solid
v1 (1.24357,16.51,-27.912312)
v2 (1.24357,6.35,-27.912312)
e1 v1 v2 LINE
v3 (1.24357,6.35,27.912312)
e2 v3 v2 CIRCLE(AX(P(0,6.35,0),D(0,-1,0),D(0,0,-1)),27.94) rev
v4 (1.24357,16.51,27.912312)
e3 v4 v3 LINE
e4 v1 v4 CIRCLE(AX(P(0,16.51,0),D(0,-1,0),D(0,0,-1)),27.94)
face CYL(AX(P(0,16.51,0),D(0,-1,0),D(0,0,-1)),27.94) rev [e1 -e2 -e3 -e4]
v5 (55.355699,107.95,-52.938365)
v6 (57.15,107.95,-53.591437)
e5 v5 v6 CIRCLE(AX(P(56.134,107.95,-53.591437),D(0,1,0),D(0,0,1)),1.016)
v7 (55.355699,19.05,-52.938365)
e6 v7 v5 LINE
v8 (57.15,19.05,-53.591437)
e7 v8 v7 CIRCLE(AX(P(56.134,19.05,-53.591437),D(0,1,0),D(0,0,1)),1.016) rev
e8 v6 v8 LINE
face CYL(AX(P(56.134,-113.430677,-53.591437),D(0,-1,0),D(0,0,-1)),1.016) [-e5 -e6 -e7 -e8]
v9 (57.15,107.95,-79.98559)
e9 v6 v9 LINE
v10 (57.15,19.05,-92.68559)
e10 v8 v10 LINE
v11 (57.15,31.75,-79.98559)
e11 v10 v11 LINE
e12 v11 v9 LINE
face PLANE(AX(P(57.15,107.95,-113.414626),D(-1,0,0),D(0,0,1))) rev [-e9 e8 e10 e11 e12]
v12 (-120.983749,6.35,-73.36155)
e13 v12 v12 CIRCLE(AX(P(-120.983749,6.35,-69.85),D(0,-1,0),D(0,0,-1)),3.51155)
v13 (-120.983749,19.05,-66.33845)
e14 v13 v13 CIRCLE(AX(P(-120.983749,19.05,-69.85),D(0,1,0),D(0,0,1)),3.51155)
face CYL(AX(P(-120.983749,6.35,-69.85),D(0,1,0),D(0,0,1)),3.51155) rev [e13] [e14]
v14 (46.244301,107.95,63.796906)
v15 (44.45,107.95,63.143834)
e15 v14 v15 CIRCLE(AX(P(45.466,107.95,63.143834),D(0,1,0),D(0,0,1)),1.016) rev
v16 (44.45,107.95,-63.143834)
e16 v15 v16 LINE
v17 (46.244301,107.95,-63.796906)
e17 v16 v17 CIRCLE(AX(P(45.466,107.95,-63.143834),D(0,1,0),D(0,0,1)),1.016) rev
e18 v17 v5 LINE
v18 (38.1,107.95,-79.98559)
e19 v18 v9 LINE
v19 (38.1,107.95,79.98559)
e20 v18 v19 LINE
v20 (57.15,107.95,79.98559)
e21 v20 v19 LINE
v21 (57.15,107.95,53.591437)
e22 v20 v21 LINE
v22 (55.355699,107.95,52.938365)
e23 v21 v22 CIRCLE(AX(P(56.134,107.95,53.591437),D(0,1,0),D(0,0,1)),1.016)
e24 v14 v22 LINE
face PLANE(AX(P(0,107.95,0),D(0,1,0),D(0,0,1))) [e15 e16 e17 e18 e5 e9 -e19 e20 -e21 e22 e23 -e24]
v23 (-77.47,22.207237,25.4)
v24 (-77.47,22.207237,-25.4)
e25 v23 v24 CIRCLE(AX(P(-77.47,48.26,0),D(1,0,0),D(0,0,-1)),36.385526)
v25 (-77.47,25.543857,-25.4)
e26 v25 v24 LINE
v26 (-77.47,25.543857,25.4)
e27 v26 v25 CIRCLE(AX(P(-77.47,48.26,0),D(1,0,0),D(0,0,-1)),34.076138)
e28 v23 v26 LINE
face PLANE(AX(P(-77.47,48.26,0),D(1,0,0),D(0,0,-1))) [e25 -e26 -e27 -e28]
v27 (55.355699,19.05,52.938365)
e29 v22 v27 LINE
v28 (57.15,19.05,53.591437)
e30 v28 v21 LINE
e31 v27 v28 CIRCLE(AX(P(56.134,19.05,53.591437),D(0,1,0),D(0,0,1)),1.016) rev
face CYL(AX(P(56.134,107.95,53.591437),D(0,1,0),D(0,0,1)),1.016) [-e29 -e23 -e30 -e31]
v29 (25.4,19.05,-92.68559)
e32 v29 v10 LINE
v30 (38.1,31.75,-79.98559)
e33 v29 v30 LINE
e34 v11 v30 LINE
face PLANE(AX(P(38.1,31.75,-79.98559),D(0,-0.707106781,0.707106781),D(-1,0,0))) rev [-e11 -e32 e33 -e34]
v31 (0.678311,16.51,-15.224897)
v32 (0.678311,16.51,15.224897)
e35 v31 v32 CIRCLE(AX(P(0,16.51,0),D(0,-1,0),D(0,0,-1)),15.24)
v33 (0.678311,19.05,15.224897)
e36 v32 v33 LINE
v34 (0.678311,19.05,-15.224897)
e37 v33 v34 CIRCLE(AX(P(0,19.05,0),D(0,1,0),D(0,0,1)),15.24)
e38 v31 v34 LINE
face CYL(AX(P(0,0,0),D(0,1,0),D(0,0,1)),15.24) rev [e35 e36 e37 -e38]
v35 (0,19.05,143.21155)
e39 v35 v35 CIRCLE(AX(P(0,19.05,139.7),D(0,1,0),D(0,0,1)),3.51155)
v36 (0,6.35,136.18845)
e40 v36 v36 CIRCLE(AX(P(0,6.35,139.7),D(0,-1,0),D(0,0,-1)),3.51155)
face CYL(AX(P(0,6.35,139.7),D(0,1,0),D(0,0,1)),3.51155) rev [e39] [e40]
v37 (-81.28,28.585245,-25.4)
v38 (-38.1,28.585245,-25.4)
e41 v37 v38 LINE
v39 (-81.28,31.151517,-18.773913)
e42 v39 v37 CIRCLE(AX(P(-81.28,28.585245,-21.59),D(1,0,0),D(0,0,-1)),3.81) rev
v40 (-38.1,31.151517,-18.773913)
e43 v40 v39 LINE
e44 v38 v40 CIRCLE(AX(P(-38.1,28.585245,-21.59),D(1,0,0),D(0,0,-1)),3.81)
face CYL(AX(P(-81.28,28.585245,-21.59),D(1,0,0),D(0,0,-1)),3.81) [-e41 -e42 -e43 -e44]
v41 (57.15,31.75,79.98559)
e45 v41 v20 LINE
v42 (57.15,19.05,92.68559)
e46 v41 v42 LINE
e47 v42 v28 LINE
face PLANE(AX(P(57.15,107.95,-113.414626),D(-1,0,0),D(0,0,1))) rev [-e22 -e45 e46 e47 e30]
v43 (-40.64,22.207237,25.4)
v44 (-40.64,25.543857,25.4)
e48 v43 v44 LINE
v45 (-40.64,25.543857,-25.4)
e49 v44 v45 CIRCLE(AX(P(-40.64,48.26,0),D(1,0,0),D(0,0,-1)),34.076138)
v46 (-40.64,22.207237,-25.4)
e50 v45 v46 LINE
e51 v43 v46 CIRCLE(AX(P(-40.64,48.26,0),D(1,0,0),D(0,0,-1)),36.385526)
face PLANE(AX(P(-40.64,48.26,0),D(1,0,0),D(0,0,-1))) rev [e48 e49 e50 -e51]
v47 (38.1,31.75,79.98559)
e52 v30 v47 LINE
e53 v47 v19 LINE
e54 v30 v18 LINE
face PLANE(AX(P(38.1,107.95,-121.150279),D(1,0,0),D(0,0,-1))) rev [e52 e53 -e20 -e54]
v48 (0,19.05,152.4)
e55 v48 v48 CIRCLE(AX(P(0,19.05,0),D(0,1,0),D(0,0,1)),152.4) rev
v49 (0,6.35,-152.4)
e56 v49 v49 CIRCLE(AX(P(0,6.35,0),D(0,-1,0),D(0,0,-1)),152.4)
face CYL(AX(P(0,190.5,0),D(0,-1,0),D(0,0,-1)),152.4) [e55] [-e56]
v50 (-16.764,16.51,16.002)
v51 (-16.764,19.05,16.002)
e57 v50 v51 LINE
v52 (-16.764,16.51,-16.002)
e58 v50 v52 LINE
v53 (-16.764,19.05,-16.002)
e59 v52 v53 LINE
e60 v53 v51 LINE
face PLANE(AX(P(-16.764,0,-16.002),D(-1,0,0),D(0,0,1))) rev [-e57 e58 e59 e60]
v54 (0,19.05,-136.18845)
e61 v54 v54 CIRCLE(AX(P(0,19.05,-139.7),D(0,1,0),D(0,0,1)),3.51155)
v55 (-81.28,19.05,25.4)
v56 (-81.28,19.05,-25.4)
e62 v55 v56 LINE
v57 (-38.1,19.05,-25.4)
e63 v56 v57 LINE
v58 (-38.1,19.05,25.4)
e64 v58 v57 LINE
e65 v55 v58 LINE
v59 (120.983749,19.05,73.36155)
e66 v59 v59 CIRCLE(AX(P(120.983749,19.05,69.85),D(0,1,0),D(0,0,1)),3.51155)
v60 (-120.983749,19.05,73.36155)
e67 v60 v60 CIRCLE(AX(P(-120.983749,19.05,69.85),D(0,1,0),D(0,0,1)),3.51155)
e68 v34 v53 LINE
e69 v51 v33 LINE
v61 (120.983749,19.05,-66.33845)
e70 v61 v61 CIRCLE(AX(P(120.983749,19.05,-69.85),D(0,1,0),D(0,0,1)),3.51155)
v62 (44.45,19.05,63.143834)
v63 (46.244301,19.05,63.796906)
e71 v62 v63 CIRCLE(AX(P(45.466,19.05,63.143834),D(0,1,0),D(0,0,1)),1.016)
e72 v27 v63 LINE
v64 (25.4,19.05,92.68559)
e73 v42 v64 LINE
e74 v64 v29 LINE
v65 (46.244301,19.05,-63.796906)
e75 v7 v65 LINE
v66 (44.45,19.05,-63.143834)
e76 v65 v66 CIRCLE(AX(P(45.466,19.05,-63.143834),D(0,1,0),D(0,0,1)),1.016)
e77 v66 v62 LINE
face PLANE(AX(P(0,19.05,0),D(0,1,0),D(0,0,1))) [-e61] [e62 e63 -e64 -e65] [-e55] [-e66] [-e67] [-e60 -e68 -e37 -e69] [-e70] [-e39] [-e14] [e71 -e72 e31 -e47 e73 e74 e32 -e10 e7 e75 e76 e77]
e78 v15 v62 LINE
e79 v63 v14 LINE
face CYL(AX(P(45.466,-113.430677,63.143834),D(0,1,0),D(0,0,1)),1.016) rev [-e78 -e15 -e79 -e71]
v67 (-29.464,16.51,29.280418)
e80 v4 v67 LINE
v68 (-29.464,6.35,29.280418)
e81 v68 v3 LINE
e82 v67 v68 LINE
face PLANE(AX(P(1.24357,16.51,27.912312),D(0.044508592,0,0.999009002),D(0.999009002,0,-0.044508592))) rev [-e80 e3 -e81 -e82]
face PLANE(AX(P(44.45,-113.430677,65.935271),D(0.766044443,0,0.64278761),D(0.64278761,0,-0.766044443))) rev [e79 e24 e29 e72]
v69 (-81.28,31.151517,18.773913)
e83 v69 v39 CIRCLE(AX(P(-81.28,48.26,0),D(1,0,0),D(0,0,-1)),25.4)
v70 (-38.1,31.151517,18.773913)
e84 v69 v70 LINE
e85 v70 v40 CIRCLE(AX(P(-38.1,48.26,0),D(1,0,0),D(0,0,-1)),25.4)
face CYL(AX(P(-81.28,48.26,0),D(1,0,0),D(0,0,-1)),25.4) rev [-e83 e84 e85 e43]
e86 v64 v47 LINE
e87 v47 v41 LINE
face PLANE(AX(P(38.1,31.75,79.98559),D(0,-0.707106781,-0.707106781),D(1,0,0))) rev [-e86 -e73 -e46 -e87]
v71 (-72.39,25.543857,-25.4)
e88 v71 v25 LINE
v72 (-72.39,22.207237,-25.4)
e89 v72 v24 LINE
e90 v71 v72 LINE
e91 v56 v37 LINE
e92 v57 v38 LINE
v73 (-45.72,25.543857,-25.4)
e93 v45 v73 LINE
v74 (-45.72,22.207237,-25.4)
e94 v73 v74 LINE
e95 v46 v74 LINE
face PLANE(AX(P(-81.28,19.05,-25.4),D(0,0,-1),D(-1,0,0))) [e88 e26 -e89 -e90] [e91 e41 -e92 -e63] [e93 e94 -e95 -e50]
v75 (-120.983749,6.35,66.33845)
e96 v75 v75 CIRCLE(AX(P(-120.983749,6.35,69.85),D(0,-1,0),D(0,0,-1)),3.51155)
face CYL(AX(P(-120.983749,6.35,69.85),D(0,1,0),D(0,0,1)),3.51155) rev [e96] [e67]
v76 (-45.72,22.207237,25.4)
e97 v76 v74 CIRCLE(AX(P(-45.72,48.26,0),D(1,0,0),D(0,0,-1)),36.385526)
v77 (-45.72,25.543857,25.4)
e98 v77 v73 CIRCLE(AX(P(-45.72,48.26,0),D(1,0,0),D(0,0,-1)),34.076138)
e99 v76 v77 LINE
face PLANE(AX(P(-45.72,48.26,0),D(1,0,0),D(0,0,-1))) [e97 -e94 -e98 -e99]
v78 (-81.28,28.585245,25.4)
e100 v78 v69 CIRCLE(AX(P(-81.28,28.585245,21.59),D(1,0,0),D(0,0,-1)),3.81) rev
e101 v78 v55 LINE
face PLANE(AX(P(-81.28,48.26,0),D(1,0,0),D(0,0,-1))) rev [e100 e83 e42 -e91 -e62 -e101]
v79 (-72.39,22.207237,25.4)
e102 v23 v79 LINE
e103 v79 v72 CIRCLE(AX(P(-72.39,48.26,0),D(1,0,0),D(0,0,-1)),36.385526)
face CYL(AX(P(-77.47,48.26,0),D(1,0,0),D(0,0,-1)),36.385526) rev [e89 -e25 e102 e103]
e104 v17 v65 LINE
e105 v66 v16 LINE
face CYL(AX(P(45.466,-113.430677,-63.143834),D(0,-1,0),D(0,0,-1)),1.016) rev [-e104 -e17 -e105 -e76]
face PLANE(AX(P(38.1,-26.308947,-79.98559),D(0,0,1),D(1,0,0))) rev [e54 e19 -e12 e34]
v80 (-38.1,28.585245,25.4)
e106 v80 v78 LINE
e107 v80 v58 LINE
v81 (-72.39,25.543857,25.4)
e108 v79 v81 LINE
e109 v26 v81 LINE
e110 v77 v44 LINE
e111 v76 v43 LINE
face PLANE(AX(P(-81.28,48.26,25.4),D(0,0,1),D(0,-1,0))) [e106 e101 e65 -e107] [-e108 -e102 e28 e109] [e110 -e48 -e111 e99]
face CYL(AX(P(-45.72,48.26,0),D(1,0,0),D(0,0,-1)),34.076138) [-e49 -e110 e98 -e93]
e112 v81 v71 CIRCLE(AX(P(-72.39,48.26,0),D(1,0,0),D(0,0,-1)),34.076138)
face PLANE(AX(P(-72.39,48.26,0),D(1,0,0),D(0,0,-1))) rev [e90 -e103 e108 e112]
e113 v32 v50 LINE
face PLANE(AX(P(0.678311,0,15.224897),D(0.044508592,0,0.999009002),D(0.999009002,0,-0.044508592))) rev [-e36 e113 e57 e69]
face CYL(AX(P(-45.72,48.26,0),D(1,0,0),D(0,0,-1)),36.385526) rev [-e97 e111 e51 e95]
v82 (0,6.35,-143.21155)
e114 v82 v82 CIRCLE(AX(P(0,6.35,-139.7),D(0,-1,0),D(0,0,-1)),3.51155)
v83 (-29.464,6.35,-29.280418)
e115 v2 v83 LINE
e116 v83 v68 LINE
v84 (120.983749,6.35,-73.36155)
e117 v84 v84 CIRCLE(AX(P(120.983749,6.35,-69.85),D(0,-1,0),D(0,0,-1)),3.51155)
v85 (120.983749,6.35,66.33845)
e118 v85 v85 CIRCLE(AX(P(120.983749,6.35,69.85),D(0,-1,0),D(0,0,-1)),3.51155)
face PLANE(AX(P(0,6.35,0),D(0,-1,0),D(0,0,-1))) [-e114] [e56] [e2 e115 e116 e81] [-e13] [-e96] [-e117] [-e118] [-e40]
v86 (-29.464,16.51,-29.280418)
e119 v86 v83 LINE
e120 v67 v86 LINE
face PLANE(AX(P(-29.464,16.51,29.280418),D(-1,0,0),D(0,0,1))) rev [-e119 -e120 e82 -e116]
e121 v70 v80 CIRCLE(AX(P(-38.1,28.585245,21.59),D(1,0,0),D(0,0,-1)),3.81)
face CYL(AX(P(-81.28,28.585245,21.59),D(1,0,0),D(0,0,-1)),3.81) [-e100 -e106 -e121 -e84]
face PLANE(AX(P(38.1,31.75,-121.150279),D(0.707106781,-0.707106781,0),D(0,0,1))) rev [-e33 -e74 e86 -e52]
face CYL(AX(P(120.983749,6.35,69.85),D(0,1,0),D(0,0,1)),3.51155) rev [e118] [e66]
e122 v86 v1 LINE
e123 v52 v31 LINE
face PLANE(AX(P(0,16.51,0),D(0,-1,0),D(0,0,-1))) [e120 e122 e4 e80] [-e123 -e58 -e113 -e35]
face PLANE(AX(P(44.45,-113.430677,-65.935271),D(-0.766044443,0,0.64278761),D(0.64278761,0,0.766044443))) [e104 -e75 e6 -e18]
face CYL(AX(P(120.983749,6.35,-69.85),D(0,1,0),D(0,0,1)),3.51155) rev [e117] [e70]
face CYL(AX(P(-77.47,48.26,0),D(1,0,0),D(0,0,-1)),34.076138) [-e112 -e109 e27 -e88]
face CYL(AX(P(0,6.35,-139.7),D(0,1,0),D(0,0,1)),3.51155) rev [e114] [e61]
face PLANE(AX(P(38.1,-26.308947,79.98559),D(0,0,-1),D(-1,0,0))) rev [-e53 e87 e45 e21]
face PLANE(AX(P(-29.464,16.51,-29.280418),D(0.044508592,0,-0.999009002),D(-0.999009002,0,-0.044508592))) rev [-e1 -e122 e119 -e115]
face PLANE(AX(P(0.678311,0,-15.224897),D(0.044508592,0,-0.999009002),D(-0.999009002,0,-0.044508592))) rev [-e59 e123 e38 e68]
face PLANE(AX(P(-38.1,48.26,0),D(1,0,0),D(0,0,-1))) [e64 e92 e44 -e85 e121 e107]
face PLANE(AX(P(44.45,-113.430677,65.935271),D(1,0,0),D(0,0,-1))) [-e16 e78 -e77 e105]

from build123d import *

# Parameters (mm, degrees)
SKETCH1_R           = 127
BOSS_EXTRUDE1_DEPTH = 19.05
CUT_EXTRUDE1_DEPTH  = 19.05
BOSS_EXTRUDE2_DEPTH = 43.18
FILLET1_R           = 3.81
CUT_EXTRUDE4_START  = -5.08
SKETCH7_R           = 36.385525633
SKETCH7_R_2         = 34.07613751
CUT_EXTRUDE4_DEPTH  = 2.54
CUT_EXTRUDE5_START  = -36.83
SKETCH8_R           = 36.385525633
SKETCH8_R_2         = 34.07613751
CUT_EXTRUDE5_DEPTH  = 2.54
SKETCH4_R           = 152.4
SKETCH4_R_2         = 127
BOSS_EXTRUDE3_DEPTH = 190.5
CUT_EXTRUDE2_START  = 12.7
CUT_EXTRUDE2_DEPTH  = 12.7
CUT_EXTRUDE6_START  = -12.7
SKETCH6_R           = 3.51155
CUT_EXTRUDE6_DEPTH  = 171.45
BOSS_EXTRUDE4_DEPTH = 88.9
CUT_EXTRUDE8_DEPTH  = 88.9
FILLET2_R           = 1.016
CUT_EXTRUDE9_START  = -16.51
CUT_EXTRUDE9_DEPTH  = 16.51
CUT_EXTRUDE12_START = -171.45
SKETCH14_R          = 152.4
SKETCH14_R_2        = 127
CUT_EXTRUDE12_DEPTH = 171.45
SKETCH15_R          = 152.4
CUT_EXTRUDE13_DEPTH = 6.35
SKETCH17_W          = 19.05
SKETCH17_H          = 41.16468875
CUT_EXTRUDE15_DEPTH = 88.9
CHAMFER2_SIZE       = 12.7


with BuildPart() as part:
    # Sketch1 → Boss-Extrude1 (new body)
    with BuildSketch(Plane(origin=(0, 0, 0), x_dir=(1, 0, 0), z_dir=(0, 1, 0))):
        with Locations(Location((0, 0, 0), (0, 0, 90))):
            Circle(SKETCH1_R)
    extrude(amount=BOSS_EXTRUDE1_DEPTH)

    # Sketch2 → Cut-Extrude1 (cut)
    with BuildSketch(Plane(origin=(0, 19.05, 0), x_dir=(1, 0, 0), z_dir=(0, 1, 0))):
        with BuildLine():
            Line((-16.764, 16.002), (-16.764, -16.002))
            Line((-16.764, -16.002), (0.678310948, -15.224897184))
            ThreePointArc((0.678310948, -15.224897184), (15.24, 0), (0.678310948, 15.224897184))
            Line((0.678310948, 15.224897184), (-16.764, 16.002))
        make_face()
    extrude(amount=-CUT_EXTRUDE1_DEPTH, mode=Mode.SUBTRACT)

    # Sketch3 → Boss-Extrude2 (add)
    with BuildSketch(Plane(origin=(-38.1, 0, 0), x_dir=(0, 0, -1), z_dir=(1, 0, 0))):
        with BuildLine():
            Line((-25.4, 19.05), (25.4, 19.05))
            Line((25.4, 19.05), (25.4, 48.26))
            ThreePointArc((25.4, 48.26), (0, 22.86), (-25.4, 48.26))
            Line((-25.4, 48.26), (-25.4, 19.05))
        make_face()
    extrude(amount=-BOSS_EXTRUDE2_DEPTH)

    # Fillet1
    fillet1_edges = [part.edges().sort_by_distance(p)[0] for p in [
        (-59.69, 48.26, 25.4),
        (-59.69, 48.26, -25.4),
    ]]
    fillet(fillet1_edges, radius=FILLET1_R - 0.0001)  # a hair under: the kernel refuses the full size

    # Sketch7 → Cut-Extrude4 (cut, symmetric)
    with BuildSketch(Plane(origin=(-38.1, 0, 0), x_dir=(0, 0, -1), z_dir=(1, 0, 0)).offset(CUT_EXTRUDE4_START)):
        with Locations((0, 48.26)):
            Circle(SKETCH7_R)
        with Locations((0, 48.26)):
            Circle(SKETCH7_R_2, mode=Mode.SUBTRACT)
    extrude(amount=CUT_EXTRUDE4_DEPTH, both=True, mode=Mode.SUBTRACT)

    # Sketch8 → Cut-Extrude5 (cut, symmetric)
    with BuildSketch(Plane(origin=(-38.1, 0, -38.1), x_dir=(0, 0, -1), z_dir=(1, 0, 0)).offset(CUT_EXTRUDE5_START)):
        with Locations((-38.1, 48.26)):
            Circle(SKETCH8_R)
        with Locations((-38.1, 48.26)):
            Circle(SKETCH8_R_2, mode=Mode.SUBTRACT)
    extrude(amount=CUT_EXTRUDE5_DEPTH, both=True, mode=Mode.SUBTRACT)

    # Sketch4 → Boss-Extrude3 (add)
    with BuildSketch(Plane(origin=(0, 0, 0), x_dir=(1, 0, 0), z_dir=(0, 1, 0))):
        with Locations(Location((0, 0, 0), (0, 0, 270))):
            Circle(SKETCH4_R)
        with Locations(Location((0, 0, 0), (0, 0, 270))):
            Circle(SKETCH4_R_2, mode=Mode.SUBTRACT)
    extrude(amount=BOSS_EXTRUDE3_DEPTH)

    # Sketch5 → Cut-Extrude2 (cut)
    with BuildSketch(Plane(origin=(0, 190.5, -228.6), x_dir=(1, 0, 0), z_dir=(0, -1, 0)).offset(CUT_EXTRUDE2_START)):
        with BuildLine():
            Line((-25.4, 351.737617729), (-25.4, 378.868426491))
            ThreePointArc((-25.4, 378.868426491), (0, 381), (25.4, 378.868426491))
            Line((25.4, 378.868426491), (25.4, 351.737617729))
            ThreePointArc((25.4, 351.737617729), (62.865, 337.485374018), (93.940305115, 312.165854121))
            Line((93.940305115, 312.165854121), (117.436274728, 325.731258501))
            ThreePointArc((117.436274728, 325.731258501), (131.982271537, 304.8), (142.836274728, 281.737167989))
            Line((142.836274728, 281.737167989), (119.340305115, 268.171763608))
            ThreePointArc((119.340305115, 268.171763608), (125.73, 228.6), (119.340305115, 189.028236392))
            Line((119.340305115, 189.028236392), (142.836274728, 175.462832011))
            ThreePointArc((142.836274728, 175.462832011), (131.982271537, 152.4), (117.436274728, 131.468741499))
            Line((117.436274728, 131.468741499), (93.940305115, 145.034145879))
            ThreePointArc((93.940305115, 145.034145879), (62.865, 119.714625982), (25.4, 105.462382271))
            Line((25.4, 105.462382271), (25.4, 78.331573509))
            ThreePointArc((25.4, 78.331573509), (0, 76.2), (-25.4, 78.331573509))
            Line((-25.4, 78.331573509), (-25.4, 105.462382271))
            ThreePointArc((-25.4, 105.462382271), (-62.865, 119.714625982), (-93.940305115, 145.034145879))
            Line((-93.940305115, 145.034145879), (-117.436274728, 131.468741499))
            ThreePointArc((-117.436274728, 131.468741499), (-131.982271537, 152.4), (-142.836274728, 175.462832011))
            Line((-142.836274728, 175.462832011), (-119.340305115, 189.028236392))
            ThreePointArc((-119.340305115, 189.028236392), (-125.73, 228.6), (-119.340305115, 268.171763608))
            Line((-119.340305115, 268.171763608), (-142.836274728, 281.737167989))
            ThreePointArc((-142.836274728, 281.737167989), (-131.982271537, 304.8), (-117.436274728, 325.731258501))
            Line((-117.436274728, 325.731258501), (-93.940305115, 312.165854121))
            ThreePointArc((-93.940305115, 312.165854121), (-62.865, 337.485374018), (-25.4, 351.737617729))
        make_face()
    extrude(amount=-CUT_EXTRUDE2_DEPTH, mode=Mode.SUBTRACT)

    # Sketch6 → Cut-Extrude6 (cut)
    with BuildSketch(Plane(origin=(0, 190.5, 0), x_dir=(1, 0, 0), z_dir=(0, 1, 0)).offset(CUT_EXTRUDE6_START)):
        with Locations(Location((0, 139.7, 0), (0, 0, 90))):
            Circle(SKETCH6_R)
        with Locations(Location((120.983748909, 69.85, 0), (0, 0, 90))):
            Circle(SKETCH6_R)
        with Locations(Location((120.983748909, -69.85, 0), (0, 0, 90))):
            Circle(SKETCH6_R)
        with Locations(Location((0, -139.7, 0), (0, 0, 90))):
            Circle(SKETCH6_R)
        with Locations(Location((-120.983748909, -69.85, 0), (0, 0, 90))):
            Circle(SKETCH6_R)
        with Locations(Location((-120.983748909, 69.85, 0), (0, 0, 90))):
            Circle(SKETCH6_R)
    extrude(amount=-CUT_EXTRUDE6_DEPTH, mode=Mode.SUBTRACT)

    # Sketch9 → Boss-Extrude4 (add)
    with BuildSketch(Plane(origin=(0, 19.05, 0), x_dir=(1, 0, 0), z_dir=(0, 1, 0))):
        with BuildLine():
            Line((38.1, 121.15027858), (38.1, -121.15027858))
            ThreePointArc((38.1, -121.15027858), (47.781803057, -117.668599451), (57.15, -113.414626482))
            Line((57.15, -113.414626482), (57.15, 113.414626482))
            ThreePointArc((57.15, 113.414626482), (47.781803057, 117.668599451), (38.1, 121.15027858))
        make_face()
    extrude(amount=BOSS_EXTRUDE4_DEPTH)

    # Sketch10 → Cut-Extrude8 (cut)
    with BuildSketch(Plane(origin=(0, 107.95, 0), x_dir=(1, 0, 0), z_dir=(0, 1, 0))):
        Polygon((57.15, -50.8), (57.15, 50.8), (44.45, 65.935270626), (44.45, -65.935270626), align=None)
    extrude(amount=-CUT_EXTRUDE8_DEPTH, mode=Mode.SUBTRACT)

    # Fillet2
    fillet2_edges = [part.edges().sort_by_distance(p)[0] for p in [
        (44.45, 63.5, 65.935270626),
        (44.45, 63.5, -65.935270626),
        (57.15, 63.5, -50.8),
        (57.15, 63.5, 50.8),
    ]]
    fillet(fillet2_edges, radius=FILLET2_R)

    # Sketch11 → Cut-Extrude9 (cut)
    with BuildSketch(Plane.XZ.offset(CUT_EXTRUDE9_START)):
        with BuildLine():
            Line((-29.464, 29.280418015), (-29.464, -29.280418015))
            Line((-29.464, -29.280418015), (1.243570072, -27.912311504))
            ThreePointArc((1.243570072, -27.912311504), (27.94, 0), (1.243570072, 27.912311504))
            Line((1.243570072, 27.912311504), (-29.464, 29.280418015))
        make_face()
        with BuildLine():
            Line((-16.764, 16.002), (-16.764, -16.002))
            Line((-16.764, -16.002), (0.678310948, -15.224897184))
            ThreePointArc((0.678310948, -15.224897184), (15.24, 0), (0.678310948, 15.224897184))
            Line((0.678310948, 15.224897184), (-16.764, 16.002))
        make_face(mode=Mode.SUBTRACT)
    extrude(amount=CUT_EXTRUDE9_DEPTH, mode=Mode.SUBTRACT)

    # Sketch14 → Cut-Extrude12 (cut)
    with BuildSketch(Plane(origin=(0, 190.5, 0), x_dir=(1, 0, 0), z_dir=(0, 1, 0)).offset(CUT_EXTRUDE12_START)):
        with Locations(Location((0, 0, 0), (0, 0, 270))):
            Circle(SKETCH14_R)
        Circle(SKETCH14_R_2, mode=Mode.SUBTRACT)
    extrude(amount=CUT_EXTRUDE12_DEPTH, mode=Mode.SUBTRACT)

    # Sketch15 → Cut-Extrude13 (cut)
    with BuildSketch(Plane.XZ):
        with Locations(Location((0, 0, 0), (0, 0, 270))):
            Circle(SKETCH15_R)
    extrude(amount=-CUT_EXTRUDE13_DEPTH, mode=Mode.SUBTRACT)

    # Sketch17 → Cut-Extrude15 (cut)
    with BuildSketch(Plane(origin=(0, 107.95, 0), x_dir=(1, 0, 0), z_dir=(0, 1, 0))):
        with Locations((47.625, 100.567934205)):
            Rectangle(SKETCH17_W, SKETCH17_H)
        with Locations((47.625, -100.567934205)):
            Rectangle(SKETCH17_W, SKETCH17_H)
    extrude(amount=-CUT_EXTRUDE15_DEPTH, mode=Mode.SUBTRACT)

    # Chamfer2
    chamfer2_edges = [part.edges().sort_by_distance(p)[0] for p in [
        (38.1, 19.05, 0),
        (47.625, 19.05, -79.98558983),
        (47.625, 19.05, 79.98558983),
    ]]
    chamfer(chamfer2_edges, length=CHAMFER2_SIZE)


solid = part.part
